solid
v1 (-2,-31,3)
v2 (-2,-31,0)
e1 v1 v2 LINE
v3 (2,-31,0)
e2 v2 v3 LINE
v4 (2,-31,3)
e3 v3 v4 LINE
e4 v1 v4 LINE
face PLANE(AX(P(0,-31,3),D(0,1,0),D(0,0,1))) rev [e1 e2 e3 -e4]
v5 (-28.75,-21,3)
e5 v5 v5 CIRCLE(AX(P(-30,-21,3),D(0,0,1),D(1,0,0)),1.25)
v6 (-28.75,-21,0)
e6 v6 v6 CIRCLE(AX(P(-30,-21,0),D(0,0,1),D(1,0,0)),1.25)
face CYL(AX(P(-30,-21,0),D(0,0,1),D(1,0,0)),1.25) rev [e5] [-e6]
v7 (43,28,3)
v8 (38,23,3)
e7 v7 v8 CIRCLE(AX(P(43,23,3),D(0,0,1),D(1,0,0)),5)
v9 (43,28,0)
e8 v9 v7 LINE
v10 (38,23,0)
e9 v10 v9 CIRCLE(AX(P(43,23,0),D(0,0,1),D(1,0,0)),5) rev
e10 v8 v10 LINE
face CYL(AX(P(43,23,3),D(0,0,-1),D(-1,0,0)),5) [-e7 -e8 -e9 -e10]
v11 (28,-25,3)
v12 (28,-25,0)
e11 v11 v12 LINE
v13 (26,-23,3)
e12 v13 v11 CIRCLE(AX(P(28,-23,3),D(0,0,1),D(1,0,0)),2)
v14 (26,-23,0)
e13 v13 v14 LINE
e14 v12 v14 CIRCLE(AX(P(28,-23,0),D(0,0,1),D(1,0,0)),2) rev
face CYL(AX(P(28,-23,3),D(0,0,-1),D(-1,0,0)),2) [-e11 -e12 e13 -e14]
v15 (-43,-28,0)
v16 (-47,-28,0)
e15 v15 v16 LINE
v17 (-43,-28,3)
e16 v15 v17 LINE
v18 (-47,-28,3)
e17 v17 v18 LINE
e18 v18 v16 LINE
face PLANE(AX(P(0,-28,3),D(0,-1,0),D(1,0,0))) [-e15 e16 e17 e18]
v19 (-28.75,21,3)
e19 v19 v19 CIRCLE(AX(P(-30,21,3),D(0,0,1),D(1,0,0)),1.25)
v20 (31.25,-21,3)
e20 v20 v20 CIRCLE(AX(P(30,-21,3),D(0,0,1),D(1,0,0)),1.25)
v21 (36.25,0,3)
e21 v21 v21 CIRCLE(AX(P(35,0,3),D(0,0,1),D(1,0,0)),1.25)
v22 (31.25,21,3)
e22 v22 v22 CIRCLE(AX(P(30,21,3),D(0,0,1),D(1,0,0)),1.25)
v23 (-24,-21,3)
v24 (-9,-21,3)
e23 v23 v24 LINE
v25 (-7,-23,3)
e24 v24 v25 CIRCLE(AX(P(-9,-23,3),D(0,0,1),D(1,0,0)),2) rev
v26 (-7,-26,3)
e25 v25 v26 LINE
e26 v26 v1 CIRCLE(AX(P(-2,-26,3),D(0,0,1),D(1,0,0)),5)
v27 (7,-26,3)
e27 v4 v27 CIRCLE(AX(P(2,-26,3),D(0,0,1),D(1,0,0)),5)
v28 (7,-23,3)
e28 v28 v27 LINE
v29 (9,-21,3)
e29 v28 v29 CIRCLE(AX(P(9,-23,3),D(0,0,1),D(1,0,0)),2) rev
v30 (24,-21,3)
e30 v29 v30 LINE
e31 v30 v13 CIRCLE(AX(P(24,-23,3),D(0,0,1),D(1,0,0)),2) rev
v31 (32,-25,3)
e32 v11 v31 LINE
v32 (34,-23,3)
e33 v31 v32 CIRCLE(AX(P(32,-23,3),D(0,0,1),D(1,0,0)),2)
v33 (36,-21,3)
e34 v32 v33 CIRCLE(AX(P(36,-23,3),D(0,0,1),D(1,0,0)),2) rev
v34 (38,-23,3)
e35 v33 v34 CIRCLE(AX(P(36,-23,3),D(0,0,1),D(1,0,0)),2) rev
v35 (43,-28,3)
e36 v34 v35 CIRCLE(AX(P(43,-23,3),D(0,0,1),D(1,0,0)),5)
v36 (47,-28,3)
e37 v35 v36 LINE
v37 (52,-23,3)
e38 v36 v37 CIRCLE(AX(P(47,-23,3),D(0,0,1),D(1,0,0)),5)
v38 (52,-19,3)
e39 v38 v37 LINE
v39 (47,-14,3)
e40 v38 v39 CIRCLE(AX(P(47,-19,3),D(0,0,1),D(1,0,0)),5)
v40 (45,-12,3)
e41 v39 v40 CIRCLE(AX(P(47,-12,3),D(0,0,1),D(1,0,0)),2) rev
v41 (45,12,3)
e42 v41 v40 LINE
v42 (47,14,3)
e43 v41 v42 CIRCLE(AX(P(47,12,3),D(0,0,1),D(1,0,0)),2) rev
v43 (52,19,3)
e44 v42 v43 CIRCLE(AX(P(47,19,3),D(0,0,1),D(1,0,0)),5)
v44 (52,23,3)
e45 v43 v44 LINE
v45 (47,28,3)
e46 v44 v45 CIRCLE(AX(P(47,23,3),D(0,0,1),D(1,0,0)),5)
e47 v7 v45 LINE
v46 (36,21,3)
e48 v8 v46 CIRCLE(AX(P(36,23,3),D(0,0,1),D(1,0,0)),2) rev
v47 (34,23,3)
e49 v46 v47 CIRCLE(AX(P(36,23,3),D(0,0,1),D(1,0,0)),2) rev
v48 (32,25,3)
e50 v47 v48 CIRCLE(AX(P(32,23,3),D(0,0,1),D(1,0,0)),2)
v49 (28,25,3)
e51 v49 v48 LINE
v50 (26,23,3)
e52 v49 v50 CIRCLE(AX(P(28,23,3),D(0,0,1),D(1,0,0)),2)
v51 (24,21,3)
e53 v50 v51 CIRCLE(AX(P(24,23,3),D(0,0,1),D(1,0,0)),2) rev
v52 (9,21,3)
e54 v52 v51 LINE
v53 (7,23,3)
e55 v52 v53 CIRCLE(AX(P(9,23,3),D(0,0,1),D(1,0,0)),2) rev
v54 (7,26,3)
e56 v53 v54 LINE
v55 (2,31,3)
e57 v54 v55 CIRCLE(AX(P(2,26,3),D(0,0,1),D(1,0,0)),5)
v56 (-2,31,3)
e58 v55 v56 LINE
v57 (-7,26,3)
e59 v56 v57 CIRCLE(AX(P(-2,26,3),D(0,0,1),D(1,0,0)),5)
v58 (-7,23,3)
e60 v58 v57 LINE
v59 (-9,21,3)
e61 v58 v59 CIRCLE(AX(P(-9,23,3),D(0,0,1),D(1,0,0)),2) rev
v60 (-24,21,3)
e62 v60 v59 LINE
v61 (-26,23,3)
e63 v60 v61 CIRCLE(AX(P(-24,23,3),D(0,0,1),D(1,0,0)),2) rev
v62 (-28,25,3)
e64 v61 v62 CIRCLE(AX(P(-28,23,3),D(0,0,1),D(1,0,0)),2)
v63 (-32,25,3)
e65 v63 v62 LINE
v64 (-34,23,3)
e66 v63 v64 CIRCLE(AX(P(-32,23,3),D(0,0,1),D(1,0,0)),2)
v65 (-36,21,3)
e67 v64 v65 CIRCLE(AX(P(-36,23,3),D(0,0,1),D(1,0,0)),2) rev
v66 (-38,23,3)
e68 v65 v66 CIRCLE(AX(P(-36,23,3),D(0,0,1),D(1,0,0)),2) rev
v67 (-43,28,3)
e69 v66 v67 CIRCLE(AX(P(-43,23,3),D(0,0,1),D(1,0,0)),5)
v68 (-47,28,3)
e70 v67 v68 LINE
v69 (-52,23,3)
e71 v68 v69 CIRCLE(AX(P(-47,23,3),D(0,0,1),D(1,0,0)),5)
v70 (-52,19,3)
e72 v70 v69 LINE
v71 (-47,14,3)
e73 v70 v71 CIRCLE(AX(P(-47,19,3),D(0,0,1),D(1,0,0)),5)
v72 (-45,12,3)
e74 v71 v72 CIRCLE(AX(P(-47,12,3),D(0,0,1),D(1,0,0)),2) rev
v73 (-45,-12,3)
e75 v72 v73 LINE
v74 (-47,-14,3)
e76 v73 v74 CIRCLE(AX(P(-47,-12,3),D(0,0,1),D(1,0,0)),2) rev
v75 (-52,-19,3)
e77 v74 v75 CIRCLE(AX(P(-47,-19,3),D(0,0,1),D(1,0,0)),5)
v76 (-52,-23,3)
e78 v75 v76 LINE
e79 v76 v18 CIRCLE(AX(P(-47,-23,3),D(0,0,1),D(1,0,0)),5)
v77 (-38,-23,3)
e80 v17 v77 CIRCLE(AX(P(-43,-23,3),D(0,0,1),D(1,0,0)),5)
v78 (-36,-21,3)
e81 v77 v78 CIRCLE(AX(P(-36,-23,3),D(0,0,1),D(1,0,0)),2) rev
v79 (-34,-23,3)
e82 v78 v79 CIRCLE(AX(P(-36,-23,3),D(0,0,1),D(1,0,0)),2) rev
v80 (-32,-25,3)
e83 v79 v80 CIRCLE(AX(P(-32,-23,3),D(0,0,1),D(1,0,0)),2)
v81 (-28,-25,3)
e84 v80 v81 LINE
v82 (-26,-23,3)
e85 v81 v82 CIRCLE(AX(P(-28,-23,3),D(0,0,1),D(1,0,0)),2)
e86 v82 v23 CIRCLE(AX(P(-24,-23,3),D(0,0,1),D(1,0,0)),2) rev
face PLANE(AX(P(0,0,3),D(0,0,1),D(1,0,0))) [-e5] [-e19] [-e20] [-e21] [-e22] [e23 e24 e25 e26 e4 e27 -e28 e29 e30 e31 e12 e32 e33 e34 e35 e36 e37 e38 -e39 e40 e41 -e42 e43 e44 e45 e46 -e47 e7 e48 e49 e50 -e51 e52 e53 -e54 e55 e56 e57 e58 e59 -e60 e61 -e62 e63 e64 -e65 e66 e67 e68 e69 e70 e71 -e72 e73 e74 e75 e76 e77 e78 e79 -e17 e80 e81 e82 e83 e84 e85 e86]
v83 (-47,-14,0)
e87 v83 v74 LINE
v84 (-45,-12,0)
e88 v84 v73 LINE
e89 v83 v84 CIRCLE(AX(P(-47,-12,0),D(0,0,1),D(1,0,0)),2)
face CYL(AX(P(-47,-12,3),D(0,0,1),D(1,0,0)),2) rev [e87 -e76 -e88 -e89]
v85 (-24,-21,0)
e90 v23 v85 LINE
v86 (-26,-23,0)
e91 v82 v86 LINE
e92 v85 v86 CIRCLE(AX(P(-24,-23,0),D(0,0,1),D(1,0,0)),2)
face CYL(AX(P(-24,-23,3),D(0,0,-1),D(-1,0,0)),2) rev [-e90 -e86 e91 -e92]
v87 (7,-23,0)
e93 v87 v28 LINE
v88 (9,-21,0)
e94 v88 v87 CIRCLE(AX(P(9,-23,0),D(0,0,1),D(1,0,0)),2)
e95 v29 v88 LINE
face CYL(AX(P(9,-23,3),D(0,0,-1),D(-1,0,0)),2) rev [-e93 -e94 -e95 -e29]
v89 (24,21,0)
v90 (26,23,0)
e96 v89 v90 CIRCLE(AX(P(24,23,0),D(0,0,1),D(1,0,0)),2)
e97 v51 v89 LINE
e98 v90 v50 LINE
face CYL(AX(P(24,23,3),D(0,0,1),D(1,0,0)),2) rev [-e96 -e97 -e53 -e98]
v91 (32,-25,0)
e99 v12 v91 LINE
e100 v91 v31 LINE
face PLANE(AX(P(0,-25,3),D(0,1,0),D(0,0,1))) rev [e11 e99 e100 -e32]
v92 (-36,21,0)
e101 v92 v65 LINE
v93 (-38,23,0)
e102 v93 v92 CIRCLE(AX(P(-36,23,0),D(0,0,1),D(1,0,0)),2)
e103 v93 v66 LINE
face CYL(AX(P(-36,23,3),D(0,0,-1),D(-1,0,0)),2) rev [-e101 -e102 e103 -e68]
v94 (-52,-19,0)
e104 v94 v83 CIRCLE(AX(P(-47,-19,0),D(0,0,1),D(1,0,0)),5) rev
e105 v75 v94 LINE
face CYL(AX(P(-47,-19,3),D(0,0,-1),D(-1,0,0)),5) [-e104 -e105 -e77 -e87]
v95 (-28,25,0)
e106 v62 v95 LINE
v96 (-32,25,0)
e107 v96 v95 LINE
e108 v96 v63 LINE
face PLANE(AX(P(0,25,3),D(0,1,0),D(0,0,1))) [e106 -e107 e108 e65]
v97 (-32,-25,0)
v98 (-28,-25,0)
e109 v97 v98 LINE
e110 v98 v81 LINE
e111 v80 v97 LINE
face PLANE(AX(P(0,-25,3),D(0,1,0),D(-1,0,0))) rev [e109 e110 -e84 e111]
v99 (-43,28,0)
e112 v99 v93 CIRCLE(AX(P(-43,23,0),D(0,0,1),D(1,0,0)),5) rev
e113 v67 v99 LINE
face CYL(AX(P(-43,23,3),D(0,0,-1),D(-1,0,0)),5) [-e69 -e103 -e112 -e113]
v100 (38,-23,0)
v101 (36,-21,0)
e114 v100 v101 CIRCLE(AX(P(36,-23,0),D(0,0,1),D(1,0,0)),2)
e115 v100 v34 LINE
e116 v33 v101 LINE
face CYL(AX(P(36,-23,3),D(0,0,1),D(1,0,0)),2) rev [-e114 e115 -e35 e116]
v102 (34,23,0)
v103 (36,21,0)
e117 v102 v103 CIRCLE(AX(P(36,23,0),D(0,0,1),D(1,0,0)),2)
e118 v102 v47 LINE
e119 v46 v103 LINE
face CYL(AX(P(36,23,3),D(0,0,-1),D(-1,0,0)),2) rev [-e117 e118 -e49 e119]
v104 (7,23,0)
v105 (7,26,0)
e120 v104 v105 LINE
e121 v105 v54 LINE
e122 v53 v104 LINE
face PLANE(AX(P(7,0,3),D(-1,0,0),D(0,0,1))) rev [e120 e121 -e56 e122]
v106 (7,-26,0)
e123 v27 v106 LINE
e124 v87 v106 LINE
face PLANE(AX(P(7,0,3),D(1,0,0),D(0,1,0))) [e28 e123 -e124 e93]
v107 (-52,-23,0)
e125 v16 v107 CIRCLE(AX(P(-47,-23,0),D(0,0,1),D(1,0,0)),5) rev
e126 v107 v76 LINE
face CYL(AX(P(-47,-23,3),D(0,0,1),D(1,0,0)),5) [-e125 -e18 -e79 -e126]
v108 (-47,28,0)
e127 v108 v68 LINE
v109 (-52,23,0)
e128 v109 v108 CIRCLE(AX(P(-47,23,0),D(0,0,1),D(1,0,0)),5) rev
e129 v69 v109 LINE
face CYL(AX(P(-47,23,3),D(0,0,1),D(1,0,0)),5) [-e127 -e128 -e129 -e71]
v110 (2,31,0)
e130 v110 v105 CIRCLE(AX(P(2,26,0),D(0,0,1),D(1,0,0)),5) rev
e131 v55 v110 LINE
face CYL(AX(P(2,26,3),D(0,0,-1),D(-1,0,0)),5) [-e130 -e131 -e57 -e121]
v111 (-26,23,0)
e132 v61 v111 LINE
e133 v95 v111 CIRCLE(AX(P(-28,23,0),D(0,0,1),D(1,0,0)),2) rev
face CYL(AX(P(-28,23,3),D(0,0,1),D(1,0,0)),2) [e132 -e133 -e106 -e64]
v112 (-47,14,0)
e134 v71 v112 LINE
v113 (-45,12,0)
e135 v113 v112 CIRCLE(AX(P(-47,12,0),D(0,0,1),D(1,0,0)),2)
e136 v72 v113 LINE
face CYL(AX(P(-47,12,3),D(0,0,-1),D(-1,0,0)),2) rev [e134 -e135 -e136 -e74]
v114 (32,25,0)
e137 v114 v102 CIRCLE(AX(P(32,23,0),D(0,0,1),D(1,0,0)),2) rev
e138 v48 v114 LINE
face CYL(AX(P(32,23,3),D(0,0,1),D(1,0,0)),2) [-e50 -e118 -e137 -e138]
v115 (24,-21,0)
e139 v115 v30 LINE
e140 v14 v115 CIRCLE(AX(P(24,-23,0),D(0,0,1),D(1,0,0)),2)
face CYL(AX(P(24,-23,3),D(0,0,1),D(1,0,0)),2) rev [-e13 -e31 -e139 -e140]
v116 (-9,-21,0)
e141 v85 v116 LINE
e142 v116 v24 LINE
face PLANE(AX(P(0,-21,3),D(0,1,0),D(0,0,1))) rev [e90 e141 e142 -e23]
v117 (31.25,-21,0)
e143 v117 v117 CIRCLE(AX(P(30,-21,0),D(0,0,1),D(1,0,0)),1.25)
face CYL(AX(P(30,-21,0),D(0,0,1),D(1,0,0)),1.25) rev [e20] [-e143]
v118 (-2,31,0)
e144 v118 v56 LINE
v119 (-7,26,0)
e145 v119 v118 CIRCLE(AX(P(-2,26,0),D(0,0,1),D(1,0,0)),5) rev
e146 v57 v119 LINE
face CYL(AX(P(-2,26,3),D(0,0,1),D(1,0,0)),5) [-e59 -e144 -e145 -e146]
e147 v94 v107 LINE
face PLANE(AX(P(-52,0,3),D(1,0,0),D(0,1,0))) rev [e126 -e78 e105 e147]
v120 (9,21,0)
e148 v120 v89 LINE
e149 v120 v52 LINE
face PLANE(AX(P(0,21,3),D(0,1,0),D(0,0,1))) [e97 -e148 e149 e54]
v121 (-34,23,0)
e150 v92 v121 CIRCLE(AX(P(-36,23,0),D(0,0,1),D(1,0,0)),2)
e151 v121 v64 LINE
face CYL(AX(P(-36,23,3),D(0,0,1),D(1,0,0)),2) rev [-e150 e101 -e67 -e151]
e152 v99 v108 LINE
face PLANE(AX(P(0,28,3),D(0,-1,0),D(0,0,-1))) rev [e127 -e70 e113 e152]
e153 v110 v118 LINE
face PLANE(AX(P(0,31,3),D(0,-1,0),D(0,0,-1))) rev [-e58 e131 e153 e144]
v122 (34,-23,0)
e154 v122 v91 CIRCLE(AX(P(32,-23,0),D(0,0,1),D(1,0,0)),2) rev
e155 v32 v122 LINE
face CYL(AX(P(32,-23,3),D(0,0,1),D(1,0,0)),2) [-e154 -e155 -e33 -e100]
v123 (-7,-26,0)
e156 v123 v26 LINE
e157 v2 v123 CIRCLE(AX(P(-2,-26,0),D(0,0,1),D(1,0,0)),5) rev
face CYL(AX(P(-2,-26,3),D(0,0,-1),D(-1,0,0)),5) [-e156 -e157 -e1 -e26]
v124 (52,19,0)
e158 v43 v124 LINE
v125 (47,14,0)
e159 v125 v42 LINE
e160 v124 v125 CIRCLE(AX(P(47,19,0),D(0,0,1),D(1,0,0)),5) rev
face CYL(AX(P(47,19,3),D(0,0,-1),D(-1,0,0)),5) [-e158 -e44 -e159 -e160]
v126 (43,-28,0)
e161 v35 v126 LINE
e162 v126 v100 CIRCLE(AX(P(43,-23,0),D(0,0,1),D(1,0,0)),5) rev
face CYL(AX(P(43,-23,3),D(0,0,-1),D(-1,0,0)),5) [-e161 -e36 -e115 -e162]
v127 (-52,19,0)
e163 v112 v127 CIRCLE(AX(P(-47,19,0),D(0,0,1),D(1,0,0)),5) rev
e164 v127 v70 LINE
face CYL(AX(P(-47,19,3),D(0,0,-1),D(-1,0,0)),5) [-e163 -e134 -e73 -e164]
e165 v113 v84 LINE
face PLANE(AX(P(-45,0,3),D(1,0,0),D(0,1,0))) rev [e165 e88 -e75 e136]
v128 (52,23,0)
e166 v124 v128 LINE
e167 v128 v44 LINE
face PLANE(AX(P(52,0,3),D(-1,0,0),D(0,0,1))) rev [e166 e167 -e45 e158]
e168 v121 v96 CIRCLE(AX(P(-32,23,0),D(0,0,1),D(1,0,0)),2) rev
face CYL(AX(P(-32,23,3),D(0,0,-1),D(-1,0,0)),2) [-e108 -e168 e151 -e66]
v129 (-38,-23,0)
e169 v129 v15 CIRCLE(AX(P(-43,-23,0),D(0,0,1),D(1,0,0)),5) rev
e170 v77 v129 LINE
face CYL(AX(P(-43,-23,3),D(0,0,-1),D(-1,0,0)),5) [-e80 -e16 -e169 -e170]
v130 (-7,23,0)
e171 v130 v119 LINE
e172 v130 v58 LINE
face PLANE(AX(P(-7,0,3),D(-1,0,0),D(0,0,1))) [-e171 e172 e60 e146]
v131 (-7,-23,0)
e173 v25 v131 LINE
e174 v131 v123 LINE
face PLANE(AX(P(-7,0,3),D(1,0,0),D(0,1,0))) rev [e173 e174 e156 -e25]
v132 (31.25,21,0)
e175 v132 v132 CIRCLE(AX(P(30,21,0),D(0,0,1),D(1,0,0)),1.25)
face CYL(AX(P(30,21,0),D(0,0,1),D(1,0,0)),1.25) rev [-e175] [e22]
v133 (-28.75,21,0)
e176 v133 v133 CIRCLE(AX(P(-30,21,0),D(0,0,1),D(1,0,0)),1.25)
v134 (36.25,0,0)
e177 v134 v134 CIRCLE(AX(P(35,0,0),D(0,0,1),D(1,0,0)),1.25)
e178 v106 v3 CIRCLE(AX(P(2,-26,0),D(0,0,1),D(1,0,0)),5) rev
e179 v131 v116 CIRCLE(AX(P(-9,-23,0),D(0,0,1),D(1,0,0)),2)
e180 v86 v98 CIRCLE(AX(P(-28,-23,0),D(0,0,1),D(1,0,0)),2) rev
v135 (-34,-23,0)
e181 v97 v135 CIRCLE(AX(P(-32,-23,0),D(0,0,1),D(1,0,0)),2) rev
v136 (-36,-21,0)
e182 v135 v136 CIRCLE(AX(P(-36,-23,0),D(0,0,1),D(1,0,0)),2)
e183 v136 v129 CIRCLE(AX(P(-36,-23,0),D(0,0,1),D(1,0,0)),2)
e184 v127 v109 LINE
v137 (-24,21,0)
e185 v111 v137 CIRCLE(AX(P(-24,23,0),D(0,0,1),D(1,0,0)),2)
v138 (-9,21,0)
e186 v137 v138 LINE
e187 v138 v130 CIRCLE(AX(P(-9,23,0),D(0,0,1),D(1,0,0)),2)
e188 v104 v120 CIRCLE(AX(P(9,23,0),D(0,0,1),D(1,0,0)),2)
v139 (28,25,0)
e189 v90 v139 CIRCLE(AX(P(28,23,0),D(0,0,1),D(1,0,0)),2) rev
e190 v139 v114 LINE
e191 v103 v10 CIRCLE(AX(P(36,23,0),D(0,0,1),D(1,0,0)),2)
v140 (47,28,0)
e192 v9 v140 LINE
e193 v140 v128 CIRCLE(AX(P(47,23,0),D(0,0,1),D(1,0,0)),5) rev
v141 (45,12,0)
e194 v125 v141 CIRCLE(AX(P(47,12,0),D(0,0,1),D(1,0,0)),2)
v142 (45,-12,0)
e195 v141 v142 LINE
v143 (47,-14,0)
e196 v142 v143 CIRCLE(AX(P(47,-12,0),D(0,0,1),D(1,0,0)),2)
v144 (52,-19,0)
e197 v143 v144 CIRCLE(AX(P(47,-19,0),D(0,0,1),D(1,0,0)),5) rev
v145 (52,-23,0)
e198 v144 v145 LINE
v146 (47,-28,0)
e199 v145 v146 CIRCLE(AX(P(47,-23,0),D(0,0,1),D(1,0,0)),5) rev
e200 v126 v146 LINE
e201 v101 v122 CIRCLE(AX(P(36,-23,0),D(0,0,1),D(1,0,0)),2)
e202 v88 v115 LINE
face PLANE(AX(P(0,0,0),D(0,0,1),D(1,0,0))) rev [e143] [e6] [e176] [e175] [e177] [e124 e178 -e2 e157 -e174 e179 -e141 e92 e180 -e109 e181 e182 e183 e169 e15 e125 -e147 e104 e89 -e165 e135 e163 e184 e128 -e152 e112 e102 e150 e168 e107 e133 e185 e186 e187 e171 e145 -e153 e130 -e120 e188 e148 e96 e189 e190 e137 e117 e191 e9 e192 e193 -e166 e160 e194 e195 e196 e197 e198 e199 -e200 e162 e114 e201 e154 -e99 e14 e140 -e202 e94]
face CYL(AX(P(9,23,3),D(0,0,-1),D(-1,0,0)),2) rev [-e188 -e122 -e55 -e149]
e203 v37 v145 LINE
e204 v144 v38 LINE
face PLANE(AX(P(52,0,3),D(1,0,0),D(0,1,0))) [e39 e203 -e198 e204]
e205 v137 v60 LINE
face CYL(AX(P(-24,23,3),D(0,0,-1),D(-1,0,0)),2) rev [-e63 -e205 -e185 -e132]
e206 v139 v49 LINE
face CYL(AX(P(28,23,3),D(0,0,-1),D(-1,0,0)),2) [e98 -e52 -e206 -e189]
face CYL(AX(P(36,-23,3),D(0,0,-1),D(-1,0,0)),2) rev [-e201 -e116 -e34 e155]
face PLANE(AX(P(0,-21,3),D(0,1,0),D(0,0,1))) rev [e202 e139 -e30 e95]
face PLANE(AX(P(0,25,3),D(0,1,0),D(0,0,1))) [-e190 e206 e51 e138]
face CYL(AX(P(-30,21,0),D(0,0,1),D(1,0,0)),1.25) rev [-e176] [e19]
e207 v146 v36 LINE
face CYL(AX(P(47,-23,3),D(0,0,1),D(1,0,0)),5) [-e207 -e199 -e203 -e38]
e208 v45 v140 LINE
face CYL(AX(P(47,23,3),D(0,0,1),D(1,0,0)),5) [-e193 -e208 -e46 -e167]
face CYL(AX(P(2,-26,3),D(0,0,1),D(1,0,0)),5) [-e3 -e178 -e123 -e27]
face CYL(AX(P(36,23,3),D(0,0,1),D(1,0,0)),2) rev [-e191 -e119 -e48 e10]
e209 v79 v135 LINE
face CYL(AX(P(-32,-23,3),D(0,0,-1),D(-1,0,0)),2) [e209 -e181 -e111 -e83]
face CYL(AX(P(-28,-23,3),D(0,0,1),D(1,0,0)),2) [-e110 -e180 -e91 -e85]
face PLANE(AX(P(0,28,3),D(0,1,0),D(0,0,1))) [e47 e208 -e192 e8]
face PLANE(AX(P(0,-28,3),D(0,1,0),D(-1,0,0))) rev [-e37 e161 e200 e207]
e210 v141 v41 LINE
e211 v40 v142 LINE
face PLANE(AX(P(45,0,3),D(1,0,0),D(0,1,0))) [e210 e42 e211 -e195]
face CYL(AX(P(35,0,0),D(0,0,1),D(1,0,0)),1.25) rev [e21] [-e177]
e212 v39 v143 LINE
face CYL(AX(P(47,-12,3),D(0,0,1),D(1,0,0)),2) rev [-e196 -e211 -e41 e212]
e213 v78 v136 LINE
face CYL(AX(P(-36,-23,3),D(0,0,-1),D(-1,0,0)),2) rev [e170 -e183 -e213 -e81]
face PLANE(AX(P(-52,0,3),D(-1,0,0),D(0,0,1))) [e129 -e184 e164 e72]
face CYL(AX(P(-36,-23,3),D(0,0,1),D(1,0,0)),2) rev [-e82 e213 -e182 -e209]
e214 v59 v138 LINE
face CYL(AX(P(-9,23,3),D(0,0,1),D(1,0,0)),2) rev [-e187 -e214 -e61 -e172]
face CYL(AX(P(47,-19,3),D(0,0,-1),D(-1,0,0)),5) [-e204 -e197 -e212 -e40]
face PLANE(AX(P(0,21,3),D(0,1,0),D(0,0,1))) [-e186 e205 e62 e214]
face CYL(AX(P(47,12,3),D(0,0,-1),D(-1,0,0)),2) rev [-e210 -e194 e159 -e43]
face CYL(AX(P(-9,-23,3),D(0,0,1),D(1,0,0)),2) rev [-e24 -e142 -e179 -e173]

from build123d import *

# Parameters (mm, degrees)
SKETCH1_W           = 90
SKETCH1_H           = 42
SKETCH1_W_2         = 14
SKETCH1_H_2         = 14
SKETCH1_H_3         = 20
SKETCH1_W_3         = 8
SKETCH1_H_4         = 8
BOSS_EXTRUDE1_DEPTH = 3
FILLET1_R           = 5
FILLET2_R           = 2
SKETCH3_R           = 1.25
CUT_EXTRUDE1_DEPTH  = 3
SKETCH4_R           = 1.25
CUT_EXTRUDE2_DEPTH  = 3


with BuildPart() as part:
    # Sketch1 → Boss-Extrude1 (new body)
    with BuildSketch(Plane.XY):
        Rectangle(SKETCH1_W, SKETCH1_H)
        with Locations((-45, 21)):
            Rectangle(SKETCH1_W_2, SKETCH1_H_2)
        with Locations((45, 21)):
            Rectangle(SKETCH1_W_2, SKETCH1_H_2)
        with Locations((45, -21)):
            Rectangle(SKETCH1_W_2, SKETCH1_H_2)
        with Locations((-45, -21)):
            Rectangle(SKETCH1_W_2, SKETCH1_H_2)
        with Locations((0, 21)):
            Rectangle(SKETCH1_W_2, SKETCH1_H_3)
        with Locations((0, -21)):
            Rectangle(SKETCH1_W_2, SKETCH1_H_3)
        with Locations((30, 21)):
            Rectangle(SKETCH1_W_3, SKETCH1_H_4)
        with Locations((-30, 21)):
            Rectangle(SKETCH1_W_3, SKETCH1_H_4)
        with Locations((30, -21)):
            Rectangle(SKETCH1_W_3, SKETCH1_H_4)
        with Locations((-30, -21)):
            Rectangle(SKETCH1_W_3, SKETCH1_H_4)
    extrude(amount=BOSS_EXTRUDE1_DEPTH)

    # Fillet1
    fillet1_edges = [part.edges().sort_by_distance(p)[0] for p in [
        (52, 14, 1.5),
        (52, 28, 1.5),
        (38, 28, 1.5),
        (7, 31, 1.5),
        (-7, 31, 1.5),
        (-38, 28, 1.5),
        (-52, 28, 1.5),
        (-52, 14, 1.5),
        (-52, -14, 1.5),
        (-52, -28, 1.5),
        (-38, -28, 1.5),
        (-7, -31, 1.5),
        (7, -31, 1.5),
        (38, -28, 1.5),
        (52, -28, 1.5),
        (52, -14, 1.5),
    ]]
    fillet(fillet1_edges, radius=FILLET1_R)

    # Fillet2
    fillet2_edges = [part.edges().sort_by_distance(p)[0] for p in [
        (-26, 25, 1.5),
        (-26, 21, 1.5),
        (-34, 25, 1.5),
        (-34, 21, 1.5),
        (-38, 21, 1.5),
        (34, 21, 1.5),
        (7, 21, 1.5),
        (26, 25, 1.5),
        (34, 25, 1.5),
        (38, 21, 1.5),
        (26, 21, 1.5),
        (-7, 21, 1.5),
        (45, 14, 1.5),
        (45, -14, 1.5),
        (38, -21, 1.5),
        (34, -21, 1.5),
        (34, -25, 1.5),
        (26, -25, 1.5),
        (26, -21, 1.5),
        (-7, -21, 1.5),
        (7, -21, 1.5),
        (-26, -21, 1.5),
        (-26, -25, 1.5),
        (-34, -25, 1.5),
        (-34, -21, 1.5),
        (-38, -21, 1.5),
        (-45, -14, 1.5),
        (-45, 14, 1.5),
    ]]
    fillet(fillet2_edges, radius=FILLET2_R - 0.0001)  # a hair under: the kernel refuses the full size

    # Sketch3 → Cut-Extrude1 (cut)
    with BuildSketch(Plane.XY.offset(3)):
        with Locations((-30, 21)):
            Circle(SKETCH3_R)
        with Locations((30, 21)):
            Circle(SKETCH3_R)
        with Locations((30, -21)):
            Circle(SKETCH3_R)
        with Locations((-30, -21)):
            Circle(SKETCH3_R)
    extrude(amount=-CUT_EXTRUDE1_DEPTH, mode=Mode.SUBTRACT)

    # Sketch4 → Cut-Extrude2 (cut)
    with BuildSketch(Plane.XY.offset(3)):
        with Locations((35, 0)):
            Circle(SKETCH4_R)
    extrude(amount=-CUT_EXTRUDE2_DEPTH, mode=Mode.SUBTRACT)


solid = part.part
